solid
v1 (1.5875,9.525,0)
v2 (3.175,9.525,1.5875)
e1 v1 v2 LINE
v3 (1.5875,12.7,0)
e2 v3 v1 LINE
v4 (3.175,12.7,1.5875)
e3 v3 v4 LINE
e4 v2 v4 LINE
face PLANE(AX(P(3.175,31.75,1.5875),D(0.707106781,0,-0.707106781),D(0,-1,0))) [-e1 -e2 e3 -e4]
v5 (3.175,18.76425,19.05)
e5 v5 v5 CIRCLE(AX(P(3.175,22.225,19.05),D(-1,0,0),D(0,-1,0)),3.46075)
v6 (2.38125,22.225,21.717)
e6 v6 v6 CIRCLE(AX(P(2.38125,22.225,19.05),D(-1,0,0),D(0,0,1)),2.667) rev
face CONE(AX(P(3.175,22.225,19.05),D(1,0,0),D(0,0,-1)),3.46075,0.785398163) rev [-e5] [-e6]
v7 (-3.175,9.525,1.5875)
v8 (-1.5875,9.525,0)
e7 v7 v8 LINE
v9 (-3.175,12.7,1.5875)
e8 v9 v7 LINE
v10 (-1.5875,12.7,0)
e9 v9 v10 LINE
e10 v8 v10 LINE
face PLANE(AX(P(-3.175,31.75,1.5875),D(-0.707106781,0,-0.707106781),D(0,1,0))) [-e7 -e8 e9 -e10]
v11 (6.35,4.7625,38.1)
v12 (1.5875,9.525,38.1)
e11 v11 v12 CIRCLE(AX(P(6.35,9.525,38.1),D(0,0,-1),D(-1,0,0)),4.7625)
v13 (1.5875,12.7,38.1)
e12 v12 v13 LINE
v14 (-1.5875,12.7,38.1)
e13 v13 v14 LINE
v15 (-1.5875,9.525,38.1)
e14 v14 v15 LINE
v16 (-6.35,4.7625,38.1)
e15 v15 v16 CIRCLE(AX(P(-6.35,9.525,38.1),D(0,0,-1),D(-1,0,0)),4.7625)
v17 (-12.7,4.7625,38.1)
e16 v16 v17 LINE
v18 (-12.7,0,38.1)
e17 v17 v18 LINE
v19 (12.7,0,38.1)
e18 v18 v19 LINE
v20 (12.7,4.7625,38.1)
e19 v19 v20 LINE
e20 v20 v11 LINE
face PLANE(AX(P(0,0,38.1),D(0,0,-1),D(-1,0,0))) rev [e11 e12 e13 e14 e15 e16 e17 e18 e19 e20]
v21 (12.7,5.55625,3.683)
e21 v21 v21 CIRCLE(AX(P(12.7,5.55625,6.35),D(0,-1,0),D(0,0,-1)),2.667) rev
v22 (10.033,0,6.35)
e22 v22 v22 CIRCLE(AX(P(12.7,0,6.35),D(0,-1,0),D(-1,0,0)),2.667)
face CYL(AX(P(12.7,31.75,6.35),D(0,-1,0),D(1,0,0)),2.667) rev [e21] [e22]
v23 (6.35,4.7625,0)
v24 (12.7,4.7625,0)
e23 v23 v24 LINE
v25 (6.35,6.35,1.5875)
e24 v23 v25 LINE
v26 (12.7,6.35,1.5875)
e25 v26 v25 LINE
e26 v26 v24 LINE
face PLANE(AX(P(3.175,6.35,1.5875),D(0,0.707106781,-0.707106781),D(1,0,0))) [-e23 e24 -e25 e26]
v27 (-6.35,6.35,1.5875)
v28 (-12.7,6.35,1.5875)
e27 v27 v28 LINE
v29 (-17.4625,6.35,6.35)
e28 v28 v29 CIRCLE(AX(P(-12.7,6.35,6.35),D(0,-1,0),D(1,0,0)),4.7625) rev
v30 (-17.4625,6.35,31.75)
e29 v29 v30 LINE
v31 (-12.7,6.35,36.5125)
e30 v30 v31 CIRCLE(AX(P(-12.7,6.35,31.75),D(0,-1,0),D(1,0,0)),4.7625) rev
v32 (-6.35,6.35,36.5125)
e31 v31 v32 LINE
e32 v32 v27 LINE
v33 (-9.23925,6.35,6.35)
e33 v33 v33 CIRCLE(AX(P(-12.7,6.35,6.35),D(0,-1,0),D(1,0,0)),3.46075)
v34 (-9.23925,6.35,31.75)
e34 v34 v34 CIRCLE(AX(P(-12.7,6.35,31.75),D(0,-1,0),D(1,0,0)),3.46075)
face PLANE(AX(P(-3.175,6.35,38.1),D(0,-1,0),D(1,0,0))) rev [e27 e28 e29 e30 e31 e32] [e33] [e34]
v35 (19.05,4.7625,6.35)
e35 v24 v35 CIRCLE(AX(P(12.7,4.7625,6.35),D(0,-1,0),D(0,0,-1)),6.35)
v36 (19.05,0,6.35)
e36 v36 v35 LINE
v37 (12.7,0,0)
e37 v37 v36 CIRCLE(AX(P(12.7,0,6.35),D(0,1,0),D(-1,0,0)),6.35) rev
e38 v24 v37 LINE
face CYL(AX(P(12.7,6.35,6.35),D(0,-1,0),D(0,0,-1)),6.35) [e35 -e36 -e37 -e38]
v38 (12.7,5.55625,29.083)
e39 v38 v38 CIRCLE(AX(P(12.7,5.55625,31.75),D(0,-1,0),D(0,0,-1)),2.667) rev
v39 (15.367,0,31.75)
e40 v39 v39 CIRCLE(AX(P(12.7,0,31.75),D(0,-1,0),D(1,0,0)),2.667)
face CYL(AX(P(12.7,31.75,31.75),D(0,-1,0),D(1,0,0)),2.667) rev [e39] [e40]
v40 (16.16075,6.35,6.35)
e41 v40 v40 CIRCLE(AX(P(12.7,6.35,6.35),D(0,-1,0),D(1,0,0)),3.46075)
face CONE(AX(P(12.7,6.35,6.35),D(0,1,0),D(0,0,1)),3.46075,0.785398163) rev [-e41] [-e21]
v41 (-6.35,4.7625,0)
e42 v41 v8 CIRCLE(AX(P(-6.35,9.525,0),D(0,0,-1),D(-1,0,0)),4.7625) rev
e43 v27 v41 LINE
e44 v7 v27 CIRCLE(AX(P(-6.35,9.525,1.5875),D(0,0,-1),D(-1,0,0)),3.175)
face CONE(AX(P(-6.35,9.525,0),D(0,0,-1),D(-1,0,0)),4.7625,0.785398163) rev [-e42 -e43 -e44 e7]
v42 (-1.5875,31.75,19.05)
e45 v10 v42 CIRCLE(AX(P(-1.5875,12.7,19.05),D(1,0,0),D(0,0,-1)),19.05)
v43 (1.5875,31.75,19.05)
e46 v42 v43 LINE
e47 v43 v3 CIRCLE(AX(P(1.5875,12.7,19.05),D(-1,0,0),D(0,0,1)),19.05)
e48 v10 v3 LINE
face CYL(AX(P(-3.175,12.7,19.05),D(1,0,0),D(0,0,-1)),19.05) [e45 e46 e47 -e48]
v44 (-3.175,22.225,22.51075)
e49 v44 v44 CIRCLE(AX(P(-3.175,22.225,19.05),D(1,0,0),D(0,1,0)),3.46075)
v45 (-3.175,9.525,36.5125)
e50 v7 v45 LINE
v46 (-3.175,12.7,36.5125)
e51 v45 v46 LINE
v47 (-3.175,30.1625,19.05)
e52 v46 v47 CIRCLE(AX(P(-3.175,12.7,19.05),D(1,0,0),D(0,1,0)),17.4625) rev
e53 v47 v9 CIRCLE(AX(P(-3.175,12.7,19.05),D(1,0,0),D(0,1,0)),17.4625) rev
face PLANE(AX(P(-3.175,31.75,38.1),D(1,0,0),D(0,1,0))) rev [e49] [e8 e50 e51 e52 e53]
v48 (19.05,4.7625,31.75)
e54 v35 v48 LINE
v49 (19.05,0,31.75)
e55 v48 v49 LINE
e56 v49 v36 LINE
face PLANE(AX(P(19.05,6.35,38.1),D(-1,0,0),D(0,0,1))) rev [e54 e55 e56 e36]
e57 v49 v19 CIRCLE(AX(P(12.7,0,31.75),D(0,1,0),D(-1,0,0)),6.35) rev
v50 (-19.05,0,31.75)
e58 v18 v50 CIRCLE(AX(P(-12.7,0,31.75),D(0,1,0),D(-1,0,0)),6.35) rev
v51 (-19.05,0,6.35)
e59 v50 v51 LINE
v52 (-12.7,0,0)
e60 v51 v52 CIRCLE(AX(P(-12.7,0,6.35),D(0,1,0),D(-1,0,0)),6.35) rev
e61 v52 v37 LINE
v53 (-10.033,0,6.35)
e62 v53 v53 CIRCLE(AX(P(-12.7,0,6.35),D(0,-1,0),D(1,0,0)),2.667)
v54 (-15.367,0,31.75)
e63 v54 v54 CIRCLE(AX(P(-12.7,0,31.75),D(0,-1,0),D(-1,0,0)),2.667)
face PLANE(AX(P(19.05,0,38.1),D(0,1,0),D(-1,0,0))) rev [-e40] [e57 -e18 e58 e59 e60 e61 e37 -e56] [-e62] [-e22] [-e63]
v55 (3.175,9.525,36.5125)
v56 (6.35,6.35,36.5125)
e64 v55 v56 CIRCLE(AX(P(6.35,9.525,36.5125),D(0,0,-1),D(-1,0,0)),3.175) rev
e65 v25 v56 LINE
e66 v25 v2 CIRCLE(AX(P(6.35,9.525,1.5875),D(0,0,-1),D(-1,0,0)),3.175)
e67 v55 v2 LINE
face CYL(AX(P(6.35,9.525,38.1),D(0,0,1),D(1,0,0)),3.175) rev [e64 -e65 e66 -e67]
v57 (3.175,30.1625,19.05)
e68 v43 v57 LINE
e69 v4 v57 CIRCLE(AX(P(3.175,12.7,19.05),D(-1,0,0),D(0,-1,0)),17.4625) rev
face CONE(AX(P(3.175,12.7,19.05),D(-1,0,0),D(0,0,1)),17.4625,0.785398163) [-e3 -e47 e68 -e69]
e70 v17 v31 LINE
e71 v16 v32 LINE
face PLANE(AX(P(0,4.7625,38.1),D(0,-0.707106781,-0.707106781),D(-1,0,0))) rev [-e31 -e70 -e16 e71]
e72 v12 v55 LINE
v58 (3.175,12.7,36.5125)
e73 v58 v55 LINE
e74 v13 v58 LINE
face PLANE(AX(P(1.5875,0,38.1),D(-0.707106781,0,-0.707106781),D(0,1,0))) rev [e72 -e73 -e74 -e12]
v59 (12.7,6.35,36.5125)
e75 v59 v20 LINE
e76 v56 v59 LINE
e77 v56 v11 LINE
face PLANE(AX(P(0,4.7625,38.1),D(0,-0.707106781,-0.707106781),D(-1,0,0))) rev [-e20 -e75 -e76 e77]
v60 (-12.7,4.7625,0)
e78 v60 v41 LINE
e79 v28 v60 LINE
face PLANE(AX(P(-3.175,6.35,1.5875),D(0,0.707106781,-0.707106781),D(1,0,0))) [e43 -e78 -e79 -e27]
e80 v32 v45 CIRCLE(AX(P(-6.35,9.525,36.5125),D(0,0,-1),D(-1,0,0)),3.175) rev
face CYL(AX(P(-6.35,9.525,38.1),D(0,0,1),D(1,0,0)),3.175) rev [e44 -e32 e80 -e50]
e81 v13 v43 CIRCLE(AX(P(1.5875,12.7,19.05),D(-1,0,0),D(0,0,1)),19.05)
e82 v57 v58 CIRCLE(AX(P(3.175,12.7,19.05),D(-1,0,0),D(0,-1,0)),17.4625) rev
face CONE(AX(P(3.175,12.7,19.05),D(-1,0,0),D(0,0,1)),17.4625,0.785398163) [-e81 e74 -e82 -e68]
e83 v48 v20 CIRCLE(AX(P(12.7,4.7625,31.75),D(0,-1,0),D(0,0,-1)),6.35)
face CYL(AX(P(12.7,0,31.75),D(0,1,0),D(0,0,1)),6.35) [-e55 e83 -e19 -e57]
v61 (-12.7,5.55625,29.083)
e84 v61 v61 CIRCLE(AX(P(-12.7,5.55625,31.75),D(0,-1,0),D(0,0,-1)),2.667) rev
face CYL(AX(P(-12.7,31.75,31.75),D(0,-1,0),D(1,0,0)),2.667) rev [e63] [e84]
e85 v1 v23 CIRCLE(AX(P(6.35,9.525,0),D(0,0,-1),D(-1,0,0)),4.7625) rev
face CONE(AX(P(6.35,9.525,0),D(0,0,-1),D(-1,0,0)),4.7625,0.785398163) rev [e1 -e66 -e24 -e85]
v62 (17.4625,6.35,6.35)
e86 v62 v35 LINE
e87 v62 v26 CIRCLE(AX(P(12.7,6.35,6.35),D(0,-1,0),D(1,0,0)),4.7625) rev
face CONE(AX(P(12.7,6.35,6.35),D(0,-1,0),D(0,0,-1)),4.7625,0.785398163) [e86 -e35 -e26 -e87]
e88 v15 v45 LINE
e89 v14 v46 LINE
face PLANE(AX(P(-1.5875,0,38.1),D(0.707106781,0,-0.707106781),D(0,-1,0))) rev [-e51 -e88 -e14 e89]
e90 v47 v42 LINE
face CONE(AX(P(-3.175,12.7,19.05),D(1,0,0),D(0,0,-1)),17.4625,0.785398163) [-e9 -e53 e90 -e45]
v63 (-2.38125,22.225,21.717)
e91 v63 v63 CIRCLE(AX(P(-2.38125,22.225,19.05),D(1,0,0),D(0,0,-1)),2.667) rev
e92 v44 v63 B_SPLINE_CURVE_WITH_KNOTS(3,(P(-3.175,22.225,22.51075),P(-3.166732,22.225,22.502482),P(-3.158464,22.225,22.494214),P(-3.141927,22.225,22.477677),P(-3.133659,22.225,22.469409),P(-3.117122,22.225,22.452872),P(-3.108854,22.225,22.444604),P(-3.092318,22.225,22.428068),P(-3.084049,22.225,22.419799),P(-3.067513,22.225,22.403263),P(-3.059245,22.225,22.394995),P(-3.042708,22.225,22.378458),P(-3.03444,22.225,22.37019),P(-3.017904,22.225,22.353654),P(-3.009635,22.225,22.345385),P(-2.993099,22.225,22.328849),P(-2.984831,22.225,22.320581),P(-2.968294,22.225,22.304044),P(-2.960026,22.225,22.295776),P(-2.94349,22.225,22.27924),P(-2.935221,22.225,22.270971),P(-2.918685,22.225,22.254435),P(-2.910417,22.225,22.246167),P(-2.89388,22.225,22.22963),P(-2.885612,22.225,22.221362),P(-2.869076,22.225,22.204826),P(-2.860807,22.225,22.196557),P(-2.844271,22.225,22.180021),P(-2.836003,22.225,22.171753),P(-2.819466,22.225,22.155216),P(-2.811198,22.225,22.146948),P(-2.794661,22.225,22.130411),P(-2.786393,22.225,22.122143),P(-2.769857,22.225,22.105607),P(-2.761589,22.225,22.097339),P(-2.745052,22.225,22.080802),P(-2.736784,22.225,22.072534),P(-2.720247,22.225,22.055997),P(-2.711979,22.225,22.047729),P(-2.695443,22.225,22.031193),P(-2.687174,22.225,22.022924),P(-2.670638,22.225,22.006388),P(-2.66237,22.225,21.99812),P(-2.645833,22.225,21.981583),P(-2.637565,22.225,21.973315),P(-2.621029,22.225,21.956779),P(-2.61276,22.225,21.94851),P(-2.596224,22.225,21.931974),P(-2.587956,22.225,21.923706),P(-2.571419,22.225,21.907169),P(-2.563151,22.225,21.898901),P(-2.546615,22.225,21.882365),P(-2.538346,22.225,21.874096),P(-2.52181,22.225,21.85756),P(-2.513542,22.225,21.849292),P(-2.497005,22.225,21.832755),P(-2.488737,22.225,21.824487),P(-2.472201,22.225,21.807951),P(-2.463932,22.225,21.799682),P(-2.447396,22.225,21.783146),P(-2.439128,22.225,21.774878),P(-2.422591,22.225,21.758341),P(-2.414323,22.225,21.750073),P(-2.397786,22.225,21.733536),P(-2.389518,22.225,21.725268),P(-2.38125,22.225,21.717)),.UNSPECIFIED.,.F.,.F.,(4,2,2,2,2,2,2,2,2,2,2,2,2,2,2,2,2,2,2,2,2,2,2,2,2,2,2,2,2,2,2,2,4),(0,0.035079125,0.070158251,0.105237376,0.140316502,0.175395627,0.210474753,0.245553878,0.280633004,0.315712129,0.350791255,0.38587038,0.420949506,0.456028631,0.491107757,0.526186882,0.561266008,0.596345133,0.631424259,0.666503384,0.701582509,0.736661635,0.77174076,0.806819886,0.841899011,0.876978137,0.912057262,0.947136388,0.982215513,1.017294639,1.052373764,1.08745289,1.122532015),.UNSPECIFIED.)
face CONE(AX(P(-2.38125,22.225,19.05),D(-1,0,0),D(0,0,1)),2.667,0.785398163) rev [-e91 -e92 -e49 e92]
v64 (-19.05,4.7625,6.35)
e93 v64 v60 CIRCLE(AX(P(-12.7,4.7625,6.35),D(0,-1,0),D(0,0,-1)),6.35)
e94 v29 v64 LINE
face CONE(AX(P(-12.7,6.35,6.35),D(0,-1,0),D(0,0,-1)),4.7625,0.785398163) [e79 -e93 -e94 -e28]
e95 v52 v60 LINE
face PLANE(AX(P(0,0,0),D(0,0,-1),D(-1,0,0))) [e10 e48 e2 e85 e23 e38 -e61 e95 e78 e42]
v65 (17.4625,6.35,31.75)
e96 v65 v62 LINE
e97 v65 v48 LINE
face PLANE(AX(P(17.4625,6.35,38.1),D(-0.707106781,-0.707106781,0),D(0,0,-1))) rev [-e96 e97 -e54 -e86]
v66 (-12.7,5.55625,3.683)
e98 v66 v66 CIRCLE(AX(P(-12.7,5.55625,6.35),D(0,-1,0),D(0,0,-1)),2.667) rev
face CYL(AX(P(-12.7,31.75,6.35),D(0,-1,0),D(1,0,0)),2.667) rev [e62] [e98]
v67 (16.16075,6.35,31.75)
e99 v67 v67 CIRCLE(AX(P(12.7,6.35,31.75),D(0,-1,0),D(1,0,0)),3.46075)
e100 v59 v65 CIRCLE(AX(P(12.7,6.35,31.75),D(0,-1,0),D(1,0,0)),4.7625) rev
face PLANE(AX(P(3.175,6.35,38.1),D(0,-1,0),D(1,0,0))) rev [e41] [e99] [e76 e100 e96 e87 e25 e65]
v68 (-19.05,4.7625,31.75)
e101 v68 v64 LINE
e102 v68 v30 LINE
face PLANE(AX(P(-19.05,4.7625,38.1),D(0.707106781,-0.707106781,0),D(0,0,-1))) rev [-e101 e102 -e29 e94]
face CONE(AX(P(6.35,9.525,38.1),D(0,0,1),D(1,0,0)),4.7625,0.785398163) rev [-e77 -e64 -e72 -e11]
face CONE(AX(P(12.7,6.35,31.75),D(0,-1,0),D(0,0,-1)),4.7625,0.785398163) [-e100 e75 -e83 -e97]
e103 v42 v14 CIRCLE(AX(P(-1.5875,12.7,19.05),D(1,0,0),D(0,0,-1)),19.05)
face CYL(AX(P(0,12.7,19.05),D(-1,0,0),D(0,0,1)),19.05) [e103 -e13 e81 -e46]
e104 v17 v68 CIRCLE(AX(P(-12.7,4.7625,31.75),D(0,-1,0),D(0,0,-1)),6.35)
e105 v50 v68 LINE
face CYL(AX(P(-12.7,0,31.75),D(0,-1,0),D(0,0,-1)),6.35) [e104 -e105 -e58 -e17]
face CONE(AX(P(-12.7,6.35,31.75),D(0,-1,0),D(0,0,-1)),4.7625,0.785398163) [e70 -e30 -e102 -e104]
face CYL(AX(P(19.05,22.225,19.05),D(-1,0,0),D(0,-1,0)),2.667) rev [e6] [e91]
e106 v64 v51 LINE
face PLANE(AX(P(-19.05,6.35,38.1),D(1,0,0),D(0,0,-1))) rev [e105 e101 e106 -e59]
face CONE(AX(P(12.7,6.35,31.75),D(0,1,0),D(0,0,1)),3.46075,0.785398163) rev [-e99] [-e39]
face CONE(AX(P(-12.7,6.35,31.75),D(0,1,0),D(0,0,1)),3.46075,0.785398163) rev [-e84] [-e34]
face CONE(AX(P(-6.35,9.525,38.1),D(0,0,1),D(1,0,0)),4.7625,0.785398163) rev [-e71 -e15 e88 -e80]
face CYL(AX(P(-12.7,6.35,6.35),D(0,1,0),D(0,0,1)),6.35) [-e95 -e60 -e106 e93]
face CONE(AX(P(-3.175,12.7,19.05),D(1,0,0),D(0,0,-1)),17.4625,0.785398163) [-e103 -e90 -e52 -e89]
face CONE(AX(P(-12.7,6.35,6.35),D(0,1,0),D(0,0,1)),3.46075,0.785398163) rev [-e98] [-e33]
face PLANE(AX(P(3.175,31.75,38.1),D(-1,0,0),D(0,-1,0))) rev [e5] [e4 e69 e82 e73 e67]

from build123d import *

# Parameters (mm, degrees)
BOSS_EXTRUDE1_DEPTH = 38.1
FILLET1_R           = 19.05
SKETCH2_R           = 2.667
CUT_EXTRUDE1_DEPTH  = 54.127911685
FILLET2_R           = 6.35
SKETCH3_R           = 2.667
CUT_EXTRUDE2_DEPTH  = 55.34724579
FILLET3_R           = 3.175
CHAMFER1_SIZE       = 1.5875
CHAMFER2_SIZE       = 0.79375


with BuildPart() as part:
    # Sketch1 → Boss-Extrude1 (new body)
    with BuildSketch(Plane.XY):
        Polygon((-3.175, 31.75), (3.175, 31.75), (3.175, 6.35), (19.05, 6.35), (19.05, 0), (-19.05, 0), (-19.05, 6.35), (-3.175, 6.35), align=None)
    extrude(amount=BOSS_EXTRUDE1_DEPTH)

    # Fillet1
    fillet1_edges = [part.edges().sort_by_distance(p)[0] for p in [
        (0, 31.75, 0),
        (0, 31.75, 38.1),
    ]]
    fillet(fillet1_edges, radius=FILLET1_R - 0.0001)  # a hair under: the kernel refuses the full size

    # Sketch2 → Cut-Extrude1 (cut, through all)
    with BuildSketch(Plane.XZ):
        with Locations((12.7, 31.75)):
            Circle(SKETCH2_R)
        with Locations((12.7, 6.35)):
            Circle(SKETCH2_R)
        with Locations((-12.7, 6.35)):
            Circle(SKETCH2_R)
        with Locations((-12.7, 31.75)):
            Circle(SKETCH2_R)
    extrude(amount=-CUT_EXTRUDE1_DEPTH, mode=Mode.SUBTRACT)

    # Fillet2
    fillet2_edges = [part.edges().sort_by_distance(p)[0] for p in [
        (19.05, 3.175, 0),
        (-19.05, 3.175, 0),
        (19.05, 3.175, 38.1),
        (-19.05, 3.175, 38.1),
    ]]
    fillet(fillet2_edges, radius=FILLET2_R)

    # Sketch3 → Cut-Extrude2 (cut, through all)
    with BuildSketch(Plane.ZY.offset(3.175)):
        with Locations(Location((19.05, 22.225, 0), (0, 0, 270))):
            Circle(SKETCH3_R)
    extrude(amount=-CUT_EXTRUDE2_DEPTH, mode=Mode.SUBTRACT)

    # Fillet3
    fillet3_edges = [part.edges().sort_by_distance(p)[0] for p in [
        (-3.175, 6.35, 19.05),
        (3.175, 6.35, 19.05),
    ]]
    fillet(fillet3_edges, radius=FILLET3_R)

    # Chamfer1
    chamfer1_edges = [part.edges().sort_by_distance(p)[0] for p in [
        (-3.175, 11.11255, 0),
        (-3.175, 11.11255, 38.1),
        (-3.175, 26.170413471, 32.520413471),
        (-3.175, 26.170413471, 5.579586529),
        (3.175, 26.170413471, 32.520413471),
        (3.175, 26.170413471, 5.579586529),
        (-19.05, 6.35, 19.05),
        (9.525, 6.35, 0),
        (-17.190128061, 6.35, 36.240128061),
        (-17.190128061, 6.35, 1.859871939),
        (19.05, 6.35, 19.05),
        (9.525, 6.35, 38.1),
        (17.190128061, 6.35, 36.240128061),
        (17.190128061, 6.35, 1.859871939),
        (3.175, 11.11255, 0),
        (3.175, 11.11255, 38.1),
        (-9.525, 6.35, 0),
        (-9.525, 6.35, 38.1),
        (4.10493597, 7.27993597, 0),
        (4.10493597, 7.27993597, 38.1),
        (-4.10493597, 7.27993597, 0),
        (-4.10493597, 7.27993597, 38.1),
    ]]
    chamfer(chamfer1_edges, length=CHAMFER1_SIZE)

    # Chamfer2
    chamfer2_edges = [part.edges().sort_by_distance(p)[0] for p in [
        (-15.367, 6.35, 31.75),
        (-15.367, 6.35, 6.35),
        (10.033, 6.35, 6.35),
        (10.033, 6.35, 31.75),
        (3.175, 24.892, 19.05),
        (-3.175, 24.892, 19.05),
    ]]
    chamfer(chamfer2_edges, length=CHAMFER2_SIZE)


solid = part.part
